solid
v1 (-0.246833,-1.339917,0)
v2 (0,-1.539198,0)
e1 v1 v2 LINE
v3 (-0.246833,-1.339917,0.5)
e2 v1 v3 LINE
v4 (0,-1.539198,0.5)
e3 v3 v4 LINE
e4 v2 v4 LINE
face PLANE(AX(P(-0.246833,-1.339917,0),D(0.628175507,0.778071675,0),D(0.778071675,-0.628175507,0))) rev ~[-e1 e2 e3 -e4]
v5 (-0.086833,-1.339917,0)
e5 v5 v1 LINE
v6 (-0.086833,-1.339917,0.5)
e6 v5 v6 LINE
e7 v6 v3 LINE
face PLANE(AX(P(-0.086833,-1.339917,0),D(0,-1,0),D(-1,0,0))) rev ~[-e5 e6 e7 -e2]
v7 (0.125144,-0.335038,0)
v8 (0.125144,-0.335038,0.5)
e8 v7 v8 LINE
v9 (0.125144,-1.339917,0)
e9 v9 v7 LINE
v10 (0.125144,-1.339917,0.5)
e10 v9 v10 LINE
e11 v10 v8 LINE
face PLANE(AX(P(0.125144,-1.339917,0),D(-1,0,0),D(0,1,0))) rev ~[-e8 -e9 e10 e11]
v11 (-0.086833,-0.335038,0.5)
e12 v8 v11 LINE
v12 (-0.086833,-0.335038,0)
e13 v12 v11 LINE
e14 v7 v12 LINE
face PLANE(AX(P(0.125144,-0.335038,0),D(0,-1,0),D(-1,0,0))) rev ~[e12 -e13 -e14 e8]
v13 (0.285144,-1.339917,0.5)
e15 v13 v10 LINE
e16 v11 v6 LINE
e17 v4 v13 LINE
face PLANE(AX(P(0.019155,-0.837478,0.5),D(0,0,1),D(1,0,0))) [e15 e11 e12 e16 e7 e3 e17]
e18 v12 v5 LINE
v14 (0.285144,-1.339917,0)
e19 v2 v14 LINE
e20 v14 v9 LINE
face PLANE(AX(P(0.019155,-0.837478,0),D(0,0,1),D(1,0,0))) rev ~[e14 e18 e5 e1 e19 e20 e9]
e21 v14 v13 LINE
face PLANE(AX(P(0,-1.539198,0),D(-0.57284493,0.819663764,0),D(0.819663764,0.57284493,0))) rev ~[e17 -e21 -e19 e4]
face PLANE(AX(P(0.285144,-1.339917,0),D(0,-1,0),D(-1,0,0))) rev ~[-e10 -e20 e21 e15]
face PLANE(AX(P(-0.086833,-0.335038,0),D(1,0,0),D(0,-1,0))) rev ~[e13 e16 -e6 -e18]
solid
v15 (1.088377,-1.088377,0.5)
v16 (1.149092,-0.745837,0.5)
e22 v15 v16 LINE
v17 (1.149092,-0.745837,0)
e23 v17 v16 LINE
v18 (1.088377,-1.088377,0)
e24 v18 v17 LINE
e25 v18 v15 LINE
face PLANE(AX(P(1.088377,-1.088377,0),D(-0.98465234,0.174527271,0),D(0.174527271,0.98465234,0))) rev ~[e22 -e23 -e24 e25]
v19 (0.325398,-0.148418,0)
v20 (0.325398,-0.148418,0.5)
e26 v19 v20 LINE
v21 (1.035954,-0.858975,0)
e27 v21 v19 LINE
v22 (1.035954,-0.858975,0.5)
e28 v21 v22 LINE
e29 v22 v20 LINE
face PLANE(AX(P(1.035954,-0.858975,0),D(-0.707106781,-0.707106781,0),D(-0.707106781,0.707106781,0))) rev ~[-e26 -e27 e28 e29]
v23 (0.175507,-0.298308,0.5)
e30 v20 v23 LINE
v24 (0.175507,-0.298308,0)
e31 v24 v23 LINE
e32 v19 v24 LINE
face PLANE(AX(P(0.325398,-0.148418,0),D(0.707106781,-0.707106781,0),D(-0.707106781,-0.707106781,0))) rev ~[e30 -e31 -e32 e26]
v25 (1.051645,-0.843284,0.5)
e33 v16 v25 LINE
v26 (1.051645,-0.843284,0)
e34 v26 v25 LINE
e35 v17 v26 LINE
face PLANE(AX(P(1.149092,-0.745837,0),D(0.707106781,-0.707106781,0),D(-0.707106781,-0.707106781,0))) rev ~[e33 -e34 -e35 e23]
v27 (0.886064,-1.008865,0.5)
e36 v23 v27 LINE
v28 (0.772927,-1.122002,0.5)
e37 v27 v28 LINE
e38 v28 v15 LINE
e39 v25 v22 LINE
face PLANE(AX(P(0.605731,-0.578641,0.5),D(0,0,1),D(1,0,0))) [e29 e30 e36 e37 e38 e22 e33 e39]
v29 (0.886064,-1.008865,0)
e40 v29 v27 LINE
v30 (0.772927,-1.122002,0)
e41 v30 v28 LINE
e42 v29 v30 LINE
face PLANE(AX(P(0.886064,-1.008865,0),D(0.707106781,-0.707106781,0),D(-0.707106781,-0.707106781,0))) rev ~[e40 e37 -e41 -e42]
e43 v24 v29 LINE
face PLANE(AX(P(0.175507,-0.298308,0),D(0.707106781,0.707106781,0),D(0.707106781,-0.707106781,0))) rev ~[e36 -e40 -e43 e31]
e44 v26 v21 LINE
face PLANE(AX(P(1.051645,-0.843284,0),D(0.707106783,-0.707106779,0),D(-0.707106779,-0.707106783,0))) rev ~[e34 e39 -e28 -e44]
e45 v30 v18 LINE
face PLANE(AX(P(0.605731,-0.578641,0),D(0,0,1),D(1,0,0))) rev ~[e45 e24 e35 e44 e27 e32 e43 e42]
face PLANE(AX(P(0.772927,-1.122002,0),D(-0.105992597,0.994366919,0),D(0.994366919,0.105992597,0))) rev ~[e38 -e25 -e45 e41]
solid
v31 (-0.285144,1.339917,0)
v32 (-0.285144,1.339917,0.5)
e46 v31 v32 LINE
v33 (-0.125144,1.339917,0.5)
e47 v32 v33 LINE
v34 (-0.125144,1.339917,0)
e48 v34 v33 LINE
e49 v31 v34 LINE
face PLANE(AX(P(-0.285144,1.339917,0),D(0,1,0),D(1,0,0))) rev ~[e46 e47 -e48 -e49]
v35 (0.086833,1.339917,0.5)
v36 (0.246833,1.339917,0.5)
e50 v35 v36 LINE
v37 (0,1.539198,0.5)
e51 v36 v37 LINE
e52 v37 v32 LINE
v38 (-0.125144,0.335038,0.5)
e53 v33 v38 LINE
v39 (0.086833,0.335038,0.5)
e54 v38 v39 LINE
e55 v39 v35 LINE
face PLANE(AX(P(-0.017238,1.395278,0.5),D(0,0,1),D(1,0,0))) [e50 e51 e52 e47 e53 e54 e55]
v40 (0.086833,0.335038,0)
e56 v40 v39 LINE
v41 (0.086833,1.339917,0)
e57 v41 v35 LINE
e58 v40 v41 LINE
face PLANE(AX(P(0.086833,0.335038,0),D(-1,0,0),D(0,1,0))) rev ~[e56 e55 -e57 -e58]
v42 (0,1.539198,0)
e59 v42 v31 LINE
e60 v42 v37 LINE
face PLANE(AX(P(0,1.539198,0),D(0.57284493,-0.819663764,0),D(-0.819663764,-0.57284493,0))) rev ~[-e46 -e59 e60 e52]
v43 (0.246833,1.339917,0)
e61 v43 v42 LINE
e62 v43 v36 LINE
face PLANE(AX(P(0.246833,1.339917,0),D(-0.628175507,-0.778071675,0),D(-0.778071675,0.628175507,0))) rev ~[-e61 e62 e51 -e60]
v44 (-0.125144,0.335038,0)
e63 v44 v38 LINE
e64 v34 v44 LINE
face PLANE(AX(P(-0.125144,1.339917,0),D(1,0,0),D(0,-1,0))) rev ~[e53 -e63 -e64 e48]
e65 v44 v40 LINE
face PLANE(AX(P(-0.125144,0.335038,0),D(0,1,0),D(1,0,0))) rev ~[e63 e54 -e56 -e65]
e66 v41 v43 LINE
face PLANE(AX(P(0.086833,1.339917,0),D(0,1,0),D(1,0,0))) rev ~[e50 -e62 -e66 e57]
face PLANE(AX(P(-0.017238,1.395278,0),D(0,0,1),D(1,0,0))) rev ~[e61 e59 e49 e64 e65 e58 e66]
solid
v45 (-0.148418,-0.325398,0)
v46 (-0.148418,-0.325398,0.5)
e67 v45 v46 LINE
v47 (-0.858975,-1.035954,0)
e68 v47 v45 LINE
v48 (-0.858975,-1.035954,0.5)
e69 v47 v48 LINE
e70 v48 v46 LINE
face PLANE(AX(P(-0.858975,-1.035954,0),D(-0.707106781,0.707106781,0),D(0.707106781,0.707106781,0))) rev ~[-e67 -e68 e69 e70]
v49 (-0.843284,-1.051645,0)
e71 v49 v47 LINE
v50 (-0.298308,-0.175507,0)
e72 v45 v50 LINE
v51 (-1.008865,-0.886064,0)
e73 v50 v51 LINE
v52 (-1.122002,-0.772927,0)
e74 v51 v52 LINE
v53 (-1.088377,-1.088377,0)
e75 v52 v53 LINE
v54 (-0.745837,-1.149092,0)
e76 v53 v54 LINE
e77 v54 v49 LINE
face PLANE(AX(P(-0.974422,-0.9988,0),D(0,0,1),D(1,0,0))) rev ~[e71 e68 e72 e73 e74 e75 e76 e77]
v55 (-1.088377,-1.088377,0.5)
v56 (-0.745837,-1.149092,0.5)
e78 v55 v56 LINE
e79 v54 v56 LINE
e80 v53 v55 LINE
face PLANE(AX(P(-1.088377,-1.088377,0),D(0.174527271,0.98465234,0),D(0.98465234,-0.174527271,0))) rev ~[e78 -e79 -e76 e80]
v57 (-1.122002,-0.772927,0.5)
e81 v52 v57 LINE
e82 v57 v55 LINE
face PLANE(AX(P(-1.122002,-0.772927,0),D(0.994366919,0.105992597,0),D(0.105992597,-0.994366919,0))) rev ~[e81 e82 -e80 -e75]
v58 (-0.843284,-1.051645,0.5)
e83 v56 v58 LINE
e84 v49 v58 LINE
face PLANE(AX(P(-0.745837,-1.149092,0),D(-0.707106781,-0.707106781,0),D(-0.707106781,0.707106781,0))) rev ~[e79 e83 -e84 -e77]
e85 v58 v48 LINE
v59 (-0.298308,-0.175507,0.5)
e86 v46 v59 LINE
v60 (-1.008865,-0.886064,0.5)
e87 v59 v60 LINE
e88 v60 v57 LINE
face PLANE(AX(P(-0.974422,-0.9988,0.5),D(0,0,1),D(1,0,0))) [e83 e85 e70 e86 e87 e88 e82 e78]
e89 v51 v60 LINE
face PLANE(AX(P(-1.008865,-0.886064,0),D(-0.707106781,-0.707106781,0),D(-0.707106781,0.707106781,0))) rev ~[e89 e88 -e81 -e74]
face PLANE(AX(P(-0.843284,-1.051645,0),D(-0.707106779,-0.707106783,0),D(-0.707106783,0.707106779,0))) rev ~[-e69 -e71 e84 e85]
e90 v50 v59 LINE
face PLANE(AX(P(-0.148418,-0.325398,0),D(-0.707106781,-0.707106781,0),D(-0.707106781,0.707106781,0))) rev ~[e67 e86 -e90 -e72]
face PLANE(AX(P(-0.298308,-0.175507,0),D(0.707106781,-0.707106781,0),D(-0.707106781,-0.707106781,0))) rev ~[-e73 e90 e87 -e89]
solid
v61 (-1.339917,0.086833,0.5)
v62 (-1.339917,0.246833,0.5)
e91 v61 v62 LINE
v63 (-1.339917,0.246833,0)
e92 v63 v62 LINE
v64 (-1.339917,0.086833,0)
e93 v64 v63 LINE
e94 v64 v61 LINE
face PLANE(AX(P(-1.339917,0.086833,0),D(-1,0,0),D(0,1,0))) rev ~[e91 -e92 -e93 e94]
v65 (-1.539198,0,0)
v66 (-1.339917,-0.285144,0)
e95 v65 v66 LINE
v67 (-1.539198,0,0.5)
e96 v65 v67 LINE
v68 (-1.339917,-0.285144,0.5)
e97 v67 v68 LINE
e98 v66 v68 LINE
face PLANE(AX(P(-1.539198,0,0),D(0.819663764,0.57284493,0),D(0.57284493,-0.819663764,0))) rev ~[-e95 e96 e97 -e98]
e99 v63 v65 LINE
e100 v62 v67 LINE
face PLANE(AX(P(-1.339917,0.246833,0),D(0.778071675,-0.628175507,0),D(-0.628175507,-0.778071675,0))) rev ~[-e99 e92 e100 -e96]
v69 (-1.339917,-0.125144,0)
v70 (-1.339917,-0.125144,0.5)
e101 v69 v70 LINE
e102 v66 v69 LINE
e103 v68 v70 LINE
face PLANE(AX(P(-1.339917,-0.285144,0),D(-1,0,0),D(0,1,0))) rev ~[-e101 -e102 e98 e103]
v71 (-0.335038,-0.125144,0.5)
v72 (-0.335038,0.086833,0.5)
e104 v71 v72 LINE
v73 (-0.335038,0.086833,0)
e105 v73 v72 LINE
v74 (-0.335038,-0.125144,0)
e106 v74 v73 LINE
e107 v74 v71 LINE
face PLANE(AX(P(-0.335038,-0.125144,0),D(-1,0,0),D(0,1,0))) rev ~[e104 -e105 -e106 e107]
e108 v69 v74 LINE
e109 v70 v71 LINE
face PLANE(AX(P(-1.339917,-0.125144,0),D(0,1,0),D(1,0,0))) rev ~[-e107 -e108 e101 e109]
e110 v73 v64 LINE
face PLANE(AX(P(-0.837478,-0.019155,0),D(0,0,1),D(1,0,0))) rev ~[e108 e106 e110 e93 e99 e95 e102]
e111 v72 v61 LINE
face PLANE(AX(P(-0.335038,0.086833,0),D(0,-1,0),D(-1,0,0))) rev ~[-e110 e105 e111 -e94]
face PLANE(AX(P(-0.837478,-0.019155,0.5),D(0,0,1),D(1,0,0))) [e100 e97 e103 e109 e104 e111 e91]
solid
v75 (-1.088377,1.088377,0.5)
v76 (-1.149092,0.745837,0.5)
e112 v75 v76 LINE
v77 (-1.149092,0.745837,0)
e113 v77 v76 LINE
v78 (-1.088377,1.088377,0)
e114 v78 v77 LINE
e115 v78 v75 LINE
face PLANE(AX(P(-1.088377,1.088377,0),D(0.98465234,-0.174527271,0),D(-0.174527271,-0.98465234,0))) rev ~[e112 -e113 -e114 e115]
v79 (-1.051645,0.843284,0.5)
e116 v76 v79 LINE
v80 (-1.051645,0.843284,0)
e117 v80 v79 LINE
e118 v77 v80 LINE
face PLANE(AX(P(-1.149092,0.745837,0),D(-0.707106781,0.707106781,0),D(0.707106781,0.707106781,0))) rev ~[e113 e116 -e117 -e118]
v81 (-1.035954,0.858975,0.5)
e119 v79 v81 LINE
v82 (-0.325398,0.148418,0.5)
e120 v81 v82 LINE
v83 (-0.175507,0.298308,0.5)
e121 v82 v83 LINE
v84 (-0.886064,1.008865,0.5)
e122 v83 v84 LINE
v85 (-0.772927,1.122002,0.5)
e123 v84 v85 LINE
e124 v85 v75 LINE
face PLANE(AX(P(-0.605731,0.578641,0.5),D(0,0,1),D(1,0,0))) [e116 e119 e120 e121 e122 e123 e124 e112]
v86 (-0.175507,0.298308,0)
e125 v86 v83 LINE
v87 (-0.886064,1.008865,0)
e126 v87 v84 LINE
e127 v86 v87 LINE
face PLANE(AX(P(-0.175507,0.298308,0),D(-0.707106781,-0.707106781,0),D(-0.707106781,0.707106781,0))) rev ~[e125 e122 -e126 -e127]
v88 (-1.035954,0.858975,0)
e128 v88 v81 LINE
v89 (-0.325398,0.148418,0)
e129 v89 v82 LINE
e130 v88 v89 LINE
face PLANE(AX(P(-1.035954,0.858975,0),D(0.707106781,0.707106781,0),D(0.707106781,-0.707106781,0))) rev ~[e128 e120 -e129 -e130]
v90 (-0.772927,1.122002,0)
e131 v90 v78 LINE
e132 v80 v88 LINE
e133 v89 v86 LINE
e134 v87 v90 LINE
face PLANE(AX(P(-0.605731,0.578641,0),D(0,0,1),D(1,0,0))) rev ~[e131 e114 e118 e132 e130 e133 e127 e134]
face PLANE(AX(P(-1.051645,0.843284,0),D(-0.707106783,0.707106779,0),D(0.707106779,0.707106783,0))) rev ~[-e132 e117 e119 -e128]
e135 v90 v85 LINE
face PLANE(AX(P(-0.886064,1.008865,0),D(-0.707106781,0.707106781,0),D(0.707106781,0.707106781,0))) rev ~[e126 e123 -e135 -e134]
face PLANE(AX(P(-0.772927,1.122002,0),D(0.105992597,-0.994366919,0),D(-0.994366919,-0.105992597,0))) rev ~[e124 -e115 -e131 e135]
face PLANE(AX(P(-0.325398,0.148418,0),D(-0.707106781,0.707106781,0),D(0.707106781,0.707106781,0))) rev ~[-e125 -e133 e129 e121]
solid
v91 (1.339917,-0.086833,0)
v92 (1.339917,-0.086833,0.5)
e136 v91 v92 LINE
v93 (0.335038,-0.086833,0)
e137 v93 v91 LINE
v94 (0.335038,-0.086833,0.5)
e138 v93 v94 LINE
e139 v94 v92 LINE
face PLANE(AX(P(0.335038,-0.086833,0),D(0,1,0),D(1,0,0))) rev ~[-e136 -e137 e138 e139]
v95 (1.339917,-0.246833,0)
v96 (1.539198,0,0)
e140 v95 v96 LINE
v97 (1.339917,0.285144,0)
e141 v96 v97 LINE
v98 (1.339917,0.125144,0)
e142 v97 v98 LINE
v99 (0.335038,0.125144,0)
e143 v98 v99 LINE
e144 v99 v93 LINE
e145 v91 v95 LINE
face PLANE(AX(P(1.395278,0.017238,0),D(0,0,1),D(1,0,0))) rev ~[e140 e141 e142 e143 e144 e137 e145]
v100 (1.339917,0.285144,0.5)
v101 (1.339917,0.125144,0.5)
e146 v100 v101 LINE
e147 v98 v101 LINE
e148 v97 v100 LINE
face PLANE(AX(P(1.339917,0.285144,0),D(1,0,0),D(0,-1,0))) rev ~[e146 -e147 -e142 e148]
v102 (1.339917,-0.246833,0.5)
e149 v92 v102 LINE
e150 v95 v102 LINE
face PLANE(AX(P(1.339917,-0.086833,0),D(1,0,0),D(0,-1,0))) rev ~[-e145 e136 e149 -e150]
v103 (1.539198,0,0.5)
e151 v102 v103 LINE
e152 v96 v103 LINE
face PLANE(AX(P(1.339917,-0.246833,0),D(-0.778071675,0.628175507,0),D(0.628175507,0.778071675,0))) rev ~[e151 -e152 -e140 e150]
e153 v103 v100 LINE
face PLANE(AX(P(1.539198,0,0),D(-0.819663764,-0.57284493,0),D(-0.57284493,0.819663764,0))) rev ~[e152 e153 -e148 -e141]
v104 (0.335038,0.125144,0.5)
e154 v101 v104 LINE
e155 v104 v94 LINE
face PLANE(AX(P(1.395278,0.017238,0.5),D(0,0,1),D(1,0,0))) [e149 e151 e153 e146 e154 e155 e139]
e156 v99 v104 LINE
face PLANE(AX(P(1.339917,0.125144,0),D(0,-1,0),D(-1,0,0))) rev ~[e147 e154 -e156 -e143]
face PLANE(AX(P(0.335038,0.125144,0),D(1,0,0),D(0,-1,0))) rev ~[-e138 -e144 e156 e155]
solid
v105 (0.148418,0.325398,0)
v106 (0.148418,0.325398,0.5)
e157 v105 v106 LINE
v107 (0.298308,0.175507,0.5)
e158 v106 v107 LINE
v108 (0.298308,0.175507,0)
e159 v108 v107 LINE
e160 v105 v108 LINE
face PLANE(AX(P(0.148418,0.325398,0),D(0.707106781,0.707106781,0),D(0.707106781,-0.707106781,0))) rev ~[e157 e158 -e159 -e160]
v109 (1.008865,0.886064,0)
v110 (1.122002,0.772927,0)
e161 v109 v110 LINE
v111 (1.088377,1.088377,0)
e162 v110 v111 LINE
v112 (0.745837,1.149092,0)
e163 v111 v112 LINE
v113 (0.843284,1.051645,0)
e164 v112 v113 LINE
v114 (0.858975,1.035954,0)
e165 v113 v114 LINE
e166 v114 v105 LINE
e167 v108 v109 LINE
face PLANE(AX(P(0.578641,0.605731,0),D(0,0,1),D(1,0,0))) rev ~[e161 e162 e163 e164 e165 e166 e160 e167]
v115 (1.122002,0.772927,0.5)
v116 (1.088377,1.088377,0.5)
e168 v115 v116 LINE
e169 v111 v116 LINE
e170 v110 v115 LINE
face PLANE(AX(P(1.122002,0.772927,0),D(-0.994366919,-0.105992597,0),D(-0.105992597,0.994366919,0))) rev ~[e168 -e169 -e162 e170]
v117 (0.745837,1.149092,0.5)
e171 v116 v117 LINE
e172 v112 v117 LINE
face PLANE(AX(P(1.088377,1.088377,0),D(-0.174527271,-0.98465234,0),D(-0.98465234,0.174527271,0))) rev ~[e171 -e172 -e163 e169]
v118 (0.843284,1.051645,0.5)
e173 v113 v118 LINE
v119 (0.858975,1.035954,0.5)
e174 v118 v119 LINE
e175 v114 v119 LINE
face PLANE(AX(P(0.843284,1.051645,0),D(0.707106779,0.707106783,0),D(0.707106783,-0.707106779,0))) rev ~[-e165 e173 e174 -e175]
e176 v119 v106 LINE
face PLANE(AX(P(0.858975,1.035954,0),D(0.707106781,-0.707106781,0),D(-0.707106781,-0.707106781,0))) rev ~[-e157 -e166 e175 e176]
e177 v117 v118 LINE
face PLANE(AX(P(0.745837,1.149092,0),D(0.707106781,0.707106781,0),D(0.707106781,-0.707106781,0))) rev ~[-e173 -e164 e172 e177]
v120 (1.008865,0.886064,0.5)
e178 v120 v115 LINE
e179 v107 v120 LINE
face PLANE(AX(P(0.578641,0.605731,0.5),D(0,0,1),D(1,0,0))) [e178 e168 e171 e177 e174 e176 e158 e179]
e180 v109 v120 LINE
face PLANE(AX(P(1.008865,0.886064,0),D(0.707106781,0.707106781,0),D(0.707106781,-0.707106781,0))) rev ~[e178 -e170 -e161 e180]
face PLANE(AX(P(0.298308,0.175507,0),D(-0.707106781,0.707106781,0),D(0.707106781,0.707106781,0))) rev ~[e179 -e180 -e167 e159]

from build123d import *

# Parameters (mm, degrees)
F1_DEPTH = 0.5


# Not quite as in the source:
# - a feature names something its author has since deleted; it is built from what else it names


with BuildPart() as f1:
    # F0 (on Top) → F1 (new body)
    with BuildSketch(Plane.XY):
        Polygon((-1.3399171252, 0.0368332625), (-1.3399171252, -0.0368332625), (-1.3399171252, -0.125143673), (-0.3350383195, -0.125143673), (-0.3350383195, -0.0368332625), (-0.3350383195, 0.0368332625), (-0.3350383195, 0.0868332625), (-1.3399171252, 0.0868332625), align=None)
        Polygon((-1.3399171252, -0.125143673), (-1.3399171252, -0.0368332625), (-1.3399171252, 0.0368332625), (-1.3399171252, 0.0868332625), (-1.3399171252, 0.14733305), (-1.3399171252, 0.2468332625), (-1.5391977504, 0), (-1.3399171252, -0.285143673), (-1.3399171252, -0.14733305), align=None)
    extrude(amount=F1_DEPTH)


with BuildPart() as f1b:
    # F0 (on Top) → F1, piece 2 (new body)
    with BuildSketch(Plane.XY):
        Polygon((-0.1755074789, 0.2983082564), (-0.8860640967, 1.0088648742), (-0.9214194358, 0.9735095352), (-0.9735095352, 0.9214194358), (-1.0359544253, 0.8589745457), (-0.3253978074, 0.1484179279), (-0.2629529173, 0.210862818), (-0.210862818, 0.2629529173), align=None)
        Polygon((-0.9214194358, 0.9735095352), (-0.8860640967, 1.0088648742), (-0.8432842867, 1.0516446842), (-0.7729270117, 1.1220019592), (-1.0883771669, 1.0883771669), (-1.1490915102, 0.7458374607), (-1.0516446842, 0.8432842867), (-1.0359544253, 0.8589745457), (-0.9735095352, 0.9214194358), align=None)
    extrude(amount=F1_DEPTH)


with BuildPart() as f1c:
    # F0 (on Top) → F1, piece 3 (new body)
    with BuildSketch(Plane.XY):
        Polygon((0.0368332625, 1.3399171252), (0.0868332625, 1.3399171252), (0.14733305, 1.3399171252), (0.2468332625, 1.3399171252), (0, 1.5391977504), (-0.285143673, 1.3399171252), (-0.14733305, 1.3399171252), (-0.125143673, 1.3399171252), (-0.0368332625, 1.3399171252), align=None)
        Polygon((0.0868332625, 0.3350383195), (0.0868332625, 1.3399171252), (0.0368332625, 1.3399171252), (-0.0368332625, 1.3399171252), (-0.125143673, 1.3399171252), (-0.125143673, 0.3350383195), (-0.0368332625, 0.3350383195), (0.0368332625, 0.3350383195), align=None)
    extrude(amount=F1_DEPTH)


with BuildPart() as f1d:
    # F0 (on Top) → F1, piece 4 (new body)
    with BuildSketch(Plane.XY):
        Polygon((0.2983082564, 0.1755074789), (1.0088648742, 0.8860640967), (0.9735095352, 0.9214194358), (0.9214194358, 0.9735095352), (0.8589745457, 1.0359544253), (0.1484179279, 0.3253978074), (0.210862818, 0.2629529173), (0.2629529173, 0.210862818), align=None)
        Polygon((0.9735095352, 0.9214194358), (1.0088648742, 0.8860640967), (1.0516446842, 0.8432842867), (1.1220019592, 0.7729270117), (1.0883771669, 1.0883771669), (0.7458374607, 1.1490915102), (0.8432842867, 1.0516446842), (0.8589745457, 1.0359544253), (0.9214194358, 0.9735095352), align=None)
    extrude(amount=F1_DEPTH)


with BuildPart() as f1e:
    # F0 (on Top) → F1, piece 5 (new body)
    with BuildSketch(Plane.XY):
        Polygon((1.3399171252, -0.0368332625), (1.3399171252, -0.0868332625), (1.3399171252, -0.14733305), (1.3399171252, -0.2468332625), (1.5391977504, 0), (1.3399171252, 0.285143673), (1.3399171252, 0.14733305), (1.3399171252, 0.125143673), (1.3399171252, 0.0368332625), align=None)
        Polygon((0.3350383195, -0.0868332625), (1.3399171252, -0.0868332625), (1.3399171252, -0.0368332625), (1.3399171252, 0.0368332625), (1.3399171252, 0.125143673), (0.3350383195, 0.125143673), (0.3350383195, 0.0368332625), (0.3350383195, -0.0368332625), align=None)
    extrude(amount=F1_DEPTH)


with BuildPart() as f1f:
    # F0 (on Top) → F1, piece 6 (new body)
    with BuildSketch(Plane.XY):
        Polygon((0.1755074789, -0.2983082564), (0.8860640967, -1.0088648742), (0.9214194358, -0.9735095352), (0.9735095352, -0.9214194358), (1.0359544253, -0.8589745457), (0.3253978074, -0.1484179279), (0.2629529173, -0.210862818), (0.210862818, -0.2629529173), align=None)
        Polygon((0.9214194358, -0.9735095352), (0.8860640967, -1.0088648742), (0.8432842867, -1.0516446842), (0.7729270117, -1.1220019592), (1.0883771669, -1.0883771669), (1.1490915102, -0.7458374607), (1.0516446842, -0.8432842867), (1.0359544253, -0.8589745457), (0.9735095352, -0.9214194358), align=None)
    extrude(amount=F1_DEPTH)


with BuildPart() as f1g:
    # F0 (on Top) → F1, piece 7 (new body)
    with BuildSketch(Plane.XY):
        Polygon((-0.0868332625, -0.3350383195), (-0.0868332625, -1.3399171252), (-0.0368332625, -1.3399171252), (0.0368332625, -1.3399171252), (0.125143673, -1.3399171252), (0.125143673, -0.3350383195), (0.0368332625, -0.3350383195), (-0.0368332625, -0.3350383195), align=None)
        Polygon((-0.14733305, -1.3399171252), (-0.2468332625, -1.3399171252), (0, -1.5391977504), (0.285143673, -1.3399171252), (0.14733305, -1.3399171252), (0.125143673, -1.3399171252), (0.0368332625, -1.3399171252), (-0.0368332625, -1.3399171252), (-0.0868332625, -1.3399171252), align=None)
    extrude(amount=F1_DEPTH)


with BuildPart() as f1h:
    # F0 (on Top) → F1, piece 8 (new body)
    with BuildSketch(Plane.XY):
        Polygon((-1.0516446842, -0.8432842867), (-1.1220019592, -0.7729270117), (-1.0883771669, -1.0883771669), (-0.7458374607, -1.1490915102), (-0.8432842867, -1.0516446842), (-0.8589745457, -1.0359544253), (-0.9214194358, -0.9735095352), (-0.9735095352, -0.9214194358), (-1.0088648742, -0.8860640967), align=None)
        Polygon((-0.2983082564, -0.1755074789), (-1.0088648742, -0.8860640967), (-0.9735095352, -0.9214194358), (-0.9214194358, -0.9735095352), (-0.8589745457, -1.0359544253), (-0.1484179279, -0.3253978074), (-0.210862818, -0.2629529173), (-0.2629529173, -0.210862818), align=None)
    extrude(amount=F1_DEPTH)


solid = Compound([f1.part, f1b.part, f1c.part, f1d.part, f1e.part, f1f.part, f1g.part, f1h.part])
